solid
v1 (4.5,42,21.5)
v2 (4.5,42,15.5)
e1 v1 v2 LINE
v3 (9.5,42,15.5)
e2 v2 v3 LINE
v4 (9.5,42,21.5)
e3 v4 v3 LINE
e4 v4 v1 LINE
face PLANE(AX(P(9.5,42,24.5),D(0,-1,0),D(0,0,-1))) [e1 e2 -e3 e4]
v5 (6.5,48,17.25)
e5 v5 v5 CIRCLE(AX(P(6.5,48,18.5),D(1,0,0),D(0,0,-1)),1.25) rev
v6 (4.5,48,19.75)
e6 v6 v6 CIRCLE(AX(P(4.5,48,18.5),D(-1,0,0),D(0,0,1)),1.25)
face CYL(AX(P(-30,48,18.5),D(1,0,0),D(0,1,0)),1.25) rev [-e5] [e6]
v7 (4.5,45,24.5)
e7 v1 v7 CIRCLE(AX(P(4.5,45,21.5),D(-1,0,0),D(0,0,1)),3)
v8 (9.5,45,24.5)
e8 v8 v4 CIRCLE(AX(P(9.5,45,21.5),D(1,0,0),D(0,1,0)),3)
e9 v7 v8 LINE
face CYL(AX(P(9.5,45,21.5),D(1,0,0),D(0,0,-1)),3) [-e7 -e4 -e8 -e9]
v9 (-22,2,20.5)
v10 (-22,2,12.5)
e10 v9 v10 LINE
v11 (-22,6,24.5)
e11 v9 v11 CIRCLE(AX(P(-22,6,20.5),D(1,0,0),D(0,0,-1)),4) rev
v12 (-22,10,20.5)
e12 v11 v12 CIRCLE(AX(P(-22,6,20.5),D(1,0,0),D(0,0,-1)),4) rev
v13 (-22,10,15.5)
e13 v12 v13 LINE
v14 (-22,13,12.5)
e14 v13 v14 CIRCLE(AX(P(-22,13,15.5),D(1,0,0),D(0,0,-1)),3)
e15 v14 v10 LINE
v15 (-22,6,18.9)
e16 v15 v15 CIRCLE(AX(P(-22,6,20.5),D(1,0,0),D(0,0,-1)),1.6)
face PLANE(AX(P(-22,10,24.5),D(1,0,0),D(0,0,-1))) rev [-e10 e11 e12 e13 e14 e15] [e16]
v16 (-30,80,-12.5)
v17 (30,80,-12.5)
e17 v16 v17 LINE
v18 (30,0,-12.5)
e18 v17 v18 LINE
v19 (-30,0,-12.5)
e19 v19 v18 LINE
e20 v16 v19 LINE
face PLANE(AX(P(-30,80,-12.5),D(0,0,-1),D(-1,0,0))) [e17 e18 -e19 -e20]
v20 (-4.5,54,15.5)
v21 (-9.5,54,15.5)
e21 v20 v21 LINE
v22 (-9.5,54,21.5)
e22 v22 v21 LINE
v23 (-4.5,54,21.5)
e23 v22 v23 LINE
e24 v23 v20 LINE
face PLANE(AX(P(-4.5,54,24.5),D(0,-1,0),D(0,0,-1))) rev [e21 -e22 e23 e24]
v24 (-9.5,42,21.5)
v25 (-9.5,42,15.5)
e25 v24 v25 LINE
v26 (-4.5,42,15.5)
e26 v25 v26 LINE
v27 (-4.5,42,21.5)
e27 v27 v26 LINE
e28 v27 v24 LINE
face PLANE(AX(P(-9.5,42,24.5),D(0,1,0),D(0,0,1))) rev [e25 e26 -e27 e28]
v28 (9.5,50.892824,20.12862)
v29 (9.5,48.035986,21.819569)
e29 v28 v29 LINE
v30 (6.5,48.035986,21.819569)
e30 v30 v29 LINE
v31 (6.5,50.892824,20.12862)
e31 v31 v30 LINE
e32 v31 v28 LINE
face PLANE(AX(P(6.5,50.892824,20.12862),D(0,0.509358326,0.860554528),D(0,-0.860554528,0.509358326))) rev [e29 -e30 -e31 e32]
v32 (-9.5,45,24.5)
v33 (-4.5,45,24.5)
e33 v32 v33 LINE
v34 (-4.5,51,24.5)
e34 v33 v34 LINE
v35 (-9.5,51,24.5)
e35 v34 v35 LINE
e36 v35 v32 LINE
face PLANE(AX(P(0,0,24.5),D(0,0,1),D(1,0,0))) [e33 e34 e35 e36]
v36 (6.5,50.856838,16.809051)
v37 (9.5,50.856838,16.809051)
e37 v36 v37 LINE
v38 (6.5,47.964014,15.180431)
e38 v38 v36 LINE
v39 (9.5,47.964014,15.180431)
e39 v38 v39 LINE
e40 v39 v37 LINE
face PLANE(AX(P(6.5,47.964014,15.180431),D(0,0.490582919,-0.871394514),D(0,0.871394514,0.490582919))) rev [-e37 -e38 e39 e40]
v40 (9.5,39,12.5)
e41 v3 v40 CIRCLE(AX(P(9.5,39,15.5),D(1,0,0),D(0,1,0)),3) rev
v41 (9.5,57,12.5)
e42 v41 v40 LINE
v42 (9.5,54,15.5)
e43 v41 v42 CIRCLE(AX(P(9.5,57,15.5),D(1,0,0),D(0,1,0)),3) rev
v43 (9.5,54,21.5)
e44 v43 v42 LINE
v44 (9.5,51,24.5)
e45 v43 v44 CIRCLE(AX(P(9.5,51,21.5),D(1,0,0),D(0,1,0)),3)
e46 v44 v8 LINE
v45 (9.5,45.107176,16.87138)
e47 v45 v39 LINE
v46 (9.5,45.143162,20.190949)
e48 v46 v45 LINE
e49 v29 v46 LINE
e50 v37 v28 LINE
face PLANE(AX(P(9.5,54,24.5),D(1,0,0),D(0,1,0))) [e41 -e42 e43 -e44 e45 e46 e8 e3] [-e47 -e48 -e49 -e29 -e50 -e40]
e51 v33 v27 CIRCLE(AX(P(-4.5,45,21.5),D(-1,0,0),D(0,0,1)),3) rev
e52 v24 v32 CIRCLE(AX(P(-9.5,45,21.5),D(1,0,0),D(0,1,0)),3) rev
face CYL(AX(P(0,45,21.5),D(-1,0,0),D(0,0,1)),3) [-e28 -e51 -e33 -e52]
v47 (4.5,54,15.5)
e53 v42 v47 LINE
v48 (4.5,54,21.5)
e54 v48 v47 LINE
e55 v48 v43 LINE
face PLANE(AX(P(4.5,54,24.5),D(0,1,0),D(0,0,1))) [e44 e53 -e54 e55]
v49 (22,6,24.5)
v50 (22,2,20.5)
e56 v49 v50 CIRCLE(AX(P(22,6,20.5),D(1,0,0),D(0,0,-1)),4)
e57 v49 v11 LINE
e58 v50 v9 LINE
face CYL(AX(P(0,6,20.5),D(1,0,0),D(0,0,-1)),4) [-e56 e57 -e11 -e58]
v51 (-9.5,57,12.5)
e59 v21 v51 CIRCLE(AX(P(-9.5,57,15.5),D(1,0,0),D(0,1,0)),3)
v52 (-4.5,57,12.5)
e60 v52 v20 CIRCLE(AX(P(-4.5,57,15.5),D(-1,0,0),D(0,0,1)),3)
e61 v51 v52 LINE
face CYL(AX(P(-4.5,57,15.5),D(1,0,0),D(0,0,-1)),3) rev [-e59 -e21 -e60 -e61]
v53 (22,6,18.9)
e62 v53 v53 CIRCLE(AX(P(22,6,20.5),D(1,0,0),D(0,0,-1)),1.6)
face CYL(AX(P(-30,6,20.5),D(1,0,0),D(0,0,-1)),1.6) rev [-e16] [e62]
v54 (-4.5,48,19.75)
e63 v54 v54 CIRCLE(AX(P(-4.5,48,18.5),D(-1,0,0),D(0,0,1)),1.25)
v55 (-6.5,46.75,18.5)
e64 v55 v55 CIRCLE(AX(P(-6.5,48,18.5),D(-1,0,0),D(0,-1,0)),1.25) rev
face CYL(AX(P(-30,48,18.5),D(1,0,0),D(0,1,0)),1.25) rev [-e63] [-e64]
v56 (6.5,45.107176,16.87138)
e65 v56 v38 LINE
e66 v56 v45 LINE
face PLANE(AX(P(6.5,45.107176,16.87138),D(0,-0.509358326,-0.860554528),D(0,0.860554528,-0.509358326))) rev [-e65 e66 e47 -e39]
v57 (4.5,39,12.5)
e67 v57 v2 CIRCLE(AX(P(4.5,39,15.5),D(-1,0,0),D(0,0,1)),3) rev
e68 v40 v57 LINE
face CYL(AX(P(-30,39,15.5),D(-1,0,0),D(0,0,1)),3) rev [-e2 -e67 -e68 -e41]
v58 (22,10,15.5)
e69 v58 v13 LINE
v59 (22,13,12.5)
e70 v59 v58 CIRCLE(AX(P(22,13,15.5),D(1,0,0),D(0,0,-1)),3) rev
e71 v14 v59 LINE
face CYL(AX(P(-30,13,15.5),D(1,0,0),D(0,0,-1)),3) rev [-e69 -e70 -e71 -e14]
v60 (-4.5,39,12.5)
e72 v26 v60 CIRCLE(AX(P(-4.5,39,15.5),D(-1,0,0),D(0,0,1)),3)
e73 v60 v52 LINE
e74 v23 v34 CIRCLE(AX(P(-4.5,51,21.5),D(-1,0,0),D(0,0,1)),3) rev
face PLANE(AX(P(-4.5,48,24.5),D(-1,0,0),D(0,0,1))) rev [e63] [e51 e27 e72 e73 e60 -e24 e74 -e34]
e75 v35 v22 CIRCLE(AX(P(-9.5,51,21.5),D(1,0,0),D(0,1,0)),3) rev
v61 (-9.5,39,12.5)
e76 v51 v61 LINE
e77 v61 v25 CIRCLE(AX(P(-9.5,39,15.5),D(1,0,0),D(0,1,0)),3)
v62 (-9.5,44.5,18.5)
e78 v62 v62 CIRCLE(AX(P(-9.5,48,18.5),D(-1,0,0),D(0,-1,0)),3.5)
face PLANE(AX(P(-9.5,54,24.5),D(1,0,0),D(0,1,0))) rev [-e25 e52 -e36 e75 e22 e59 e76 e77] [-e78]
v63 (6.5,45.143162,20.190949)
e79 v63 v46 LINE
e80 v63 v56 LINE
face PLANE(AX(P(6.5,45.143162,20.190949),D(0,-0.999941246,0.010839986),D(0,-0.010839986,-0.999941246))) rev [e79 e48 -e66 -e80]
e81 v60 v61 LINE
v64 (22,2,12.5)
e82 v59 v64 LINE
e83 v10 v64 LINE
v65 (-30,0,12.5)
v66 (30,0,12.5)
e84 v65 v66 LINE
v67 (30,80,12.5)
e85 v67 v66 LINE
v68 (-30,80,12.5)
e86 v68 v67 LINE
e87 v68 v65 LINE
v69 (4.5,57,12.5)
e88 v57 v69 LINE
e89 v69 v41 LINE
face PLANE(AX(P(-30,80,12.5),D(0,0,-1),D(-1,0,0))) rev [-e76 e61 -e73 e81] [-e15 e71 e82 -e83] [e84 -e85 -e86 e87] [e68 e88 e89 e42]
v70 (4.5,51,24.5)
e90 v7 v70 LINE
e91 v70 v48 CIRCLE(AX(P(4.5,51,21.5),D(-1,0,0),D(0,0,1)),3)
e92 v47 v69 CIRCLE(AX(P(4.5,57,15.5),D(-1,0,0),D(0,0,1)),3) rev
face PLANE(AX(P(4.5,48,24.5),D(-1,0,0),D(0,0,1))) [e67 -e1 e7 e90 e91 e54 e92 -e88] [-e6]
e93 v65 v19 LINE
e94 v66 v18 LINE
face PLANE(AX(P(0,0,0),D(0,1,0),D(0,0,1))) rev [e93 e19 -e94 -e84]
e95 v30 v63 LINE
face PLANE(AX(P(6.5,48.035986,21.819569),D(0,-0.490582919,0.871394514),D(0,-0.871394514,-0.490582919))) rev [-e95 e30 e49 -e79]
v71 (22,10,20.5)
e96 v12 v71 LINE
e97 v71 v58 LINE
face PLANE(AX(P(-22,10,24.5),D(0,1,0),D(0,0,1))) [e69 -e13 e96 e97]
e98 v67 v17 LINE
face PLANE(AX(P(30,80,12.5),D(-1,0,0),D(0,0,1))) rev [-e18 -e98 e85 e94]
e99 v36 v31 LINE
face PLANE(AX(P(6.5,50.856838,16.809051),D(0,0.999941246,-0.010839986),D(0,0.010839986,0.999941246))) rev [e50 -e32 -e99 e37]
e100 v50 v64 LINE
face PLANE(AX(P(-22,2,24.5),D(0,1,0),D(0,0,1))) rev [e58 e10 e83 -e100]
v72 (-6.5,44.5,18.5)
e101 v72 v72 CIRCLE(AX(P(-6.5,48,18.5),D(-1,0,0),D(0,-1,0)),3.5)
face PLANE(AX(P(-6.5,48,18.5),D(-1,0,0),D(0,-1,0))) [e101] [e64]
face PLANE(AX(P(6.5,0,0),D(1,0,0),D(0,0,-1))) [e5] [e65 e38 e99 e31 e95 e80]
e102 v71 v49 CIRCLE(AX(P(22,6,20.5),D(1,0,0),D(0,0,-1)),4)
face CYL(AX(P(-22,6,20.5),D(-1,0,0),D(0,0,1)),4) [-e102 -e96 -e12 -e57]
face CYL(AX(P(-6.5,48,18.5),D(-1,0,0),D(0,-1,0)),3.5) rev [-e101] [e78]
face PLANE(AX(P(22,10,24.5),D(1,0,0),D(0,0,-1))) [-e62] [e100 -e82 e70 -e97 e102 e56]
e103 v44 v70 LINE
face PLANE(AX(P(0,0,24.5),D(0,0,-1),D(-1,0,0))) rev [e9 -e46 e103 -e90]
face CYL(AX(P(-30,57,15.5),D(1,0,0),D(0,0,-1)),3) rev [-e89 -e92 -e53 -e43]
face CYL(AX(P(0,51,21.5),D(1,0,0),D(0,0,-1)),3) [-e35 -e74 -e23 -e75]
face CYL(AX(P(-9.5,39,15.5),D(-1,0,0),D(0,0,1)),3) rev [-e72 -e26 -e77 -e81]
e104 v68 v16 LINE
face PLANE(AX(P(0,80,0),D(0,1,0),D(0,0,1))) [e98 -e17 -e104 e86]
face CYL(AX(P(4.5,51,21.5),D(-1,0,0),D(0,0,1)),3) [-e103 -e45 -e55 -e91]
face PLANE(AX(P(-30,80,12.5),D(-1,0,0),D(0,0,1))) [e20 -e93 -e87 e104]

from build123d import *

# Parameters (mm, degrees)
SKETCH1_W           = 60
SKETCH1_H           = 25
BOSS_EXTRUDE1_DEPTH = 80
SKETCH2_W           = 44
SKETCH2_H           = 8
BOSS_EXTRUDE2_DEPTH = 12
SKETCH3_R           = 1.6
CUT_EXTRUDE1_DEPTH  = 99.510151761
FILLET1_R           = 4
CUT_EXTRUDE2_DEPTH  = 93.522970121
CUT_EXTRUDE3_DEPTH  = 3
SKETCH6_R           = 3.5
CUT_EXTRUDE4_DEPTH  = 3
FILLET2_R           = 3
FILLET3_R           = 3


with BuildPart() as part:
    # Sketch1 → Boss-Extrude1 (new body)
    with BuildSketch(Plane(origin=(0, 0, 0), x_dir=(1, 0, 0), z_dir=(0, 1, 0))):
        Rectangle(SKETCH1_W, SKETCH1_H)
    extrude(amount=BOSS_EXTRUDE1_DEPTH)

    # Sketch2 → Boss-Extrude2 (add)
    with BuildSketch(Plane.XY.offset(12.5)):
        with Locations((0, 6)):
            Rectangle(SKETCH2_W, SKETCH2_H)
        Polygon((-4.5, 48), (-4.5, 54), (-9.5, 54), (-9.5, 42), (-4.5, 42), align=None)
        Polygon((4.5, 48), (4.5, 54), (9.5, 54), (9.5, 42), (4.5, 42), align=None)
    extrude(amount=BOSS_EXTRUDE2_DEPTH)

    # Sketch3 → Cut-Extrude1 (cut, through all)
    with BuildSketch(Plane(origin=(22, 0, 0), x_dir=(0, 0, -1), z_dir=(1, 0, 0))):
        with Locations((-20.5, 6)):
            Circle(SKETCH3_R)
    extrude(amount=-CUT_EXTRUDE1_DEPTH, mode=Mode.SUBTRACT)

    # Fillet1
    fillet1_edges = [part.edges().sort_by_distance(p)[0] for p in [
        (0, 2, 24.5),
        (0, 10, 24.5),
    ]]
    fillet(fillet1_edges, radius=FILLET1_R - 0.0001)  # a hair under: the kernel refuses the full size

    # Sketch4 → Cut-Extrude2 (cut, through all)
    with BuildSketch(Plane(origin=(9.5, 0, 0), x_dir=(0, 0, -1), z_dir=(1, 0, 0))):
        with BuildLine():
            ThreePointArc((-17.25, 48), (-18.02164571, 49.154849416), (-19.383883476, 48.883883476))
            Line((-19.383883476, 48.883883476), (-17.616116524, 47.116116524))
            ThreePointArc((-17.616116524, 47.116116524), (-17.345150584, 47.52164571), (-17.25, 48))
        make_face()
        with BuildLine():
            Line((-17.616116524, 47.116116524), (-19.383883476, 48.883883476))
            ThreePointArc((-19.383883476, 48.883883476), (-19.383883476, 47.116116524), (-17.616116524, 47.116116524))
        make_face()
    extrude(amount=-CUT_EXTRUDE2_DEPTH, mode=Mode.SUBTRACT)

    # Sketch5 → Cut-Extrude3 (cut)
    with BuildSketch(Plane(origin=(9.5, 0, 0), x_dir=(0, 0, -1), z_dir=(1, 0, 0))):
        Polygon((-16.871380461, 45.107175821), (-15.180431003, 47.964013804), (-16.809050541, 50.856837983), (-20.128619539, 50.892824179), (-21.819568997, 48.035986196), (-20.190949459, 45.143162017), align=None)
    extrude(amount=-CUT_EXTRUDE3_DEPTH, mode=Mode.SUBTRACT)

    # Sketch6 → Cut-Extrude4 (cut)
    with BuildSketch(Plane.ZY.offset(9.5)):
        with Locations(Location((18.5, 48, 0), (0, 0, 270))):
            Circle(SKETCH6_R)
    extrude(amount=-CUT_EXTRUDE4_DEPTH, mode=Mode.SUBTRACT)

    # Fillet2
    fillet2_edges = [part.edges().sort_by_distance(p)[0] for p in [
        (-7, 54, 24.5),
        (-7, 42, 24.5),
        (7, 42, 24.5),
        (7, 54, 24.5),
    ]]
    fillet(fillet2_edges, radius=FILLET2_R)

    # Fillet3
    fillet3_edges = [part.edges().sort_by_distance(p)[0] for p in [
        (0, 10, 12.5),
        (-7, 54, 12.5),
        (-7, 42, 12.5),
        (7, 42, 12.5),
        (7, 54, 12.5),
    ]]
    fillet(fillet3_edges, radius=FILLET3_R)


solid = part.part
